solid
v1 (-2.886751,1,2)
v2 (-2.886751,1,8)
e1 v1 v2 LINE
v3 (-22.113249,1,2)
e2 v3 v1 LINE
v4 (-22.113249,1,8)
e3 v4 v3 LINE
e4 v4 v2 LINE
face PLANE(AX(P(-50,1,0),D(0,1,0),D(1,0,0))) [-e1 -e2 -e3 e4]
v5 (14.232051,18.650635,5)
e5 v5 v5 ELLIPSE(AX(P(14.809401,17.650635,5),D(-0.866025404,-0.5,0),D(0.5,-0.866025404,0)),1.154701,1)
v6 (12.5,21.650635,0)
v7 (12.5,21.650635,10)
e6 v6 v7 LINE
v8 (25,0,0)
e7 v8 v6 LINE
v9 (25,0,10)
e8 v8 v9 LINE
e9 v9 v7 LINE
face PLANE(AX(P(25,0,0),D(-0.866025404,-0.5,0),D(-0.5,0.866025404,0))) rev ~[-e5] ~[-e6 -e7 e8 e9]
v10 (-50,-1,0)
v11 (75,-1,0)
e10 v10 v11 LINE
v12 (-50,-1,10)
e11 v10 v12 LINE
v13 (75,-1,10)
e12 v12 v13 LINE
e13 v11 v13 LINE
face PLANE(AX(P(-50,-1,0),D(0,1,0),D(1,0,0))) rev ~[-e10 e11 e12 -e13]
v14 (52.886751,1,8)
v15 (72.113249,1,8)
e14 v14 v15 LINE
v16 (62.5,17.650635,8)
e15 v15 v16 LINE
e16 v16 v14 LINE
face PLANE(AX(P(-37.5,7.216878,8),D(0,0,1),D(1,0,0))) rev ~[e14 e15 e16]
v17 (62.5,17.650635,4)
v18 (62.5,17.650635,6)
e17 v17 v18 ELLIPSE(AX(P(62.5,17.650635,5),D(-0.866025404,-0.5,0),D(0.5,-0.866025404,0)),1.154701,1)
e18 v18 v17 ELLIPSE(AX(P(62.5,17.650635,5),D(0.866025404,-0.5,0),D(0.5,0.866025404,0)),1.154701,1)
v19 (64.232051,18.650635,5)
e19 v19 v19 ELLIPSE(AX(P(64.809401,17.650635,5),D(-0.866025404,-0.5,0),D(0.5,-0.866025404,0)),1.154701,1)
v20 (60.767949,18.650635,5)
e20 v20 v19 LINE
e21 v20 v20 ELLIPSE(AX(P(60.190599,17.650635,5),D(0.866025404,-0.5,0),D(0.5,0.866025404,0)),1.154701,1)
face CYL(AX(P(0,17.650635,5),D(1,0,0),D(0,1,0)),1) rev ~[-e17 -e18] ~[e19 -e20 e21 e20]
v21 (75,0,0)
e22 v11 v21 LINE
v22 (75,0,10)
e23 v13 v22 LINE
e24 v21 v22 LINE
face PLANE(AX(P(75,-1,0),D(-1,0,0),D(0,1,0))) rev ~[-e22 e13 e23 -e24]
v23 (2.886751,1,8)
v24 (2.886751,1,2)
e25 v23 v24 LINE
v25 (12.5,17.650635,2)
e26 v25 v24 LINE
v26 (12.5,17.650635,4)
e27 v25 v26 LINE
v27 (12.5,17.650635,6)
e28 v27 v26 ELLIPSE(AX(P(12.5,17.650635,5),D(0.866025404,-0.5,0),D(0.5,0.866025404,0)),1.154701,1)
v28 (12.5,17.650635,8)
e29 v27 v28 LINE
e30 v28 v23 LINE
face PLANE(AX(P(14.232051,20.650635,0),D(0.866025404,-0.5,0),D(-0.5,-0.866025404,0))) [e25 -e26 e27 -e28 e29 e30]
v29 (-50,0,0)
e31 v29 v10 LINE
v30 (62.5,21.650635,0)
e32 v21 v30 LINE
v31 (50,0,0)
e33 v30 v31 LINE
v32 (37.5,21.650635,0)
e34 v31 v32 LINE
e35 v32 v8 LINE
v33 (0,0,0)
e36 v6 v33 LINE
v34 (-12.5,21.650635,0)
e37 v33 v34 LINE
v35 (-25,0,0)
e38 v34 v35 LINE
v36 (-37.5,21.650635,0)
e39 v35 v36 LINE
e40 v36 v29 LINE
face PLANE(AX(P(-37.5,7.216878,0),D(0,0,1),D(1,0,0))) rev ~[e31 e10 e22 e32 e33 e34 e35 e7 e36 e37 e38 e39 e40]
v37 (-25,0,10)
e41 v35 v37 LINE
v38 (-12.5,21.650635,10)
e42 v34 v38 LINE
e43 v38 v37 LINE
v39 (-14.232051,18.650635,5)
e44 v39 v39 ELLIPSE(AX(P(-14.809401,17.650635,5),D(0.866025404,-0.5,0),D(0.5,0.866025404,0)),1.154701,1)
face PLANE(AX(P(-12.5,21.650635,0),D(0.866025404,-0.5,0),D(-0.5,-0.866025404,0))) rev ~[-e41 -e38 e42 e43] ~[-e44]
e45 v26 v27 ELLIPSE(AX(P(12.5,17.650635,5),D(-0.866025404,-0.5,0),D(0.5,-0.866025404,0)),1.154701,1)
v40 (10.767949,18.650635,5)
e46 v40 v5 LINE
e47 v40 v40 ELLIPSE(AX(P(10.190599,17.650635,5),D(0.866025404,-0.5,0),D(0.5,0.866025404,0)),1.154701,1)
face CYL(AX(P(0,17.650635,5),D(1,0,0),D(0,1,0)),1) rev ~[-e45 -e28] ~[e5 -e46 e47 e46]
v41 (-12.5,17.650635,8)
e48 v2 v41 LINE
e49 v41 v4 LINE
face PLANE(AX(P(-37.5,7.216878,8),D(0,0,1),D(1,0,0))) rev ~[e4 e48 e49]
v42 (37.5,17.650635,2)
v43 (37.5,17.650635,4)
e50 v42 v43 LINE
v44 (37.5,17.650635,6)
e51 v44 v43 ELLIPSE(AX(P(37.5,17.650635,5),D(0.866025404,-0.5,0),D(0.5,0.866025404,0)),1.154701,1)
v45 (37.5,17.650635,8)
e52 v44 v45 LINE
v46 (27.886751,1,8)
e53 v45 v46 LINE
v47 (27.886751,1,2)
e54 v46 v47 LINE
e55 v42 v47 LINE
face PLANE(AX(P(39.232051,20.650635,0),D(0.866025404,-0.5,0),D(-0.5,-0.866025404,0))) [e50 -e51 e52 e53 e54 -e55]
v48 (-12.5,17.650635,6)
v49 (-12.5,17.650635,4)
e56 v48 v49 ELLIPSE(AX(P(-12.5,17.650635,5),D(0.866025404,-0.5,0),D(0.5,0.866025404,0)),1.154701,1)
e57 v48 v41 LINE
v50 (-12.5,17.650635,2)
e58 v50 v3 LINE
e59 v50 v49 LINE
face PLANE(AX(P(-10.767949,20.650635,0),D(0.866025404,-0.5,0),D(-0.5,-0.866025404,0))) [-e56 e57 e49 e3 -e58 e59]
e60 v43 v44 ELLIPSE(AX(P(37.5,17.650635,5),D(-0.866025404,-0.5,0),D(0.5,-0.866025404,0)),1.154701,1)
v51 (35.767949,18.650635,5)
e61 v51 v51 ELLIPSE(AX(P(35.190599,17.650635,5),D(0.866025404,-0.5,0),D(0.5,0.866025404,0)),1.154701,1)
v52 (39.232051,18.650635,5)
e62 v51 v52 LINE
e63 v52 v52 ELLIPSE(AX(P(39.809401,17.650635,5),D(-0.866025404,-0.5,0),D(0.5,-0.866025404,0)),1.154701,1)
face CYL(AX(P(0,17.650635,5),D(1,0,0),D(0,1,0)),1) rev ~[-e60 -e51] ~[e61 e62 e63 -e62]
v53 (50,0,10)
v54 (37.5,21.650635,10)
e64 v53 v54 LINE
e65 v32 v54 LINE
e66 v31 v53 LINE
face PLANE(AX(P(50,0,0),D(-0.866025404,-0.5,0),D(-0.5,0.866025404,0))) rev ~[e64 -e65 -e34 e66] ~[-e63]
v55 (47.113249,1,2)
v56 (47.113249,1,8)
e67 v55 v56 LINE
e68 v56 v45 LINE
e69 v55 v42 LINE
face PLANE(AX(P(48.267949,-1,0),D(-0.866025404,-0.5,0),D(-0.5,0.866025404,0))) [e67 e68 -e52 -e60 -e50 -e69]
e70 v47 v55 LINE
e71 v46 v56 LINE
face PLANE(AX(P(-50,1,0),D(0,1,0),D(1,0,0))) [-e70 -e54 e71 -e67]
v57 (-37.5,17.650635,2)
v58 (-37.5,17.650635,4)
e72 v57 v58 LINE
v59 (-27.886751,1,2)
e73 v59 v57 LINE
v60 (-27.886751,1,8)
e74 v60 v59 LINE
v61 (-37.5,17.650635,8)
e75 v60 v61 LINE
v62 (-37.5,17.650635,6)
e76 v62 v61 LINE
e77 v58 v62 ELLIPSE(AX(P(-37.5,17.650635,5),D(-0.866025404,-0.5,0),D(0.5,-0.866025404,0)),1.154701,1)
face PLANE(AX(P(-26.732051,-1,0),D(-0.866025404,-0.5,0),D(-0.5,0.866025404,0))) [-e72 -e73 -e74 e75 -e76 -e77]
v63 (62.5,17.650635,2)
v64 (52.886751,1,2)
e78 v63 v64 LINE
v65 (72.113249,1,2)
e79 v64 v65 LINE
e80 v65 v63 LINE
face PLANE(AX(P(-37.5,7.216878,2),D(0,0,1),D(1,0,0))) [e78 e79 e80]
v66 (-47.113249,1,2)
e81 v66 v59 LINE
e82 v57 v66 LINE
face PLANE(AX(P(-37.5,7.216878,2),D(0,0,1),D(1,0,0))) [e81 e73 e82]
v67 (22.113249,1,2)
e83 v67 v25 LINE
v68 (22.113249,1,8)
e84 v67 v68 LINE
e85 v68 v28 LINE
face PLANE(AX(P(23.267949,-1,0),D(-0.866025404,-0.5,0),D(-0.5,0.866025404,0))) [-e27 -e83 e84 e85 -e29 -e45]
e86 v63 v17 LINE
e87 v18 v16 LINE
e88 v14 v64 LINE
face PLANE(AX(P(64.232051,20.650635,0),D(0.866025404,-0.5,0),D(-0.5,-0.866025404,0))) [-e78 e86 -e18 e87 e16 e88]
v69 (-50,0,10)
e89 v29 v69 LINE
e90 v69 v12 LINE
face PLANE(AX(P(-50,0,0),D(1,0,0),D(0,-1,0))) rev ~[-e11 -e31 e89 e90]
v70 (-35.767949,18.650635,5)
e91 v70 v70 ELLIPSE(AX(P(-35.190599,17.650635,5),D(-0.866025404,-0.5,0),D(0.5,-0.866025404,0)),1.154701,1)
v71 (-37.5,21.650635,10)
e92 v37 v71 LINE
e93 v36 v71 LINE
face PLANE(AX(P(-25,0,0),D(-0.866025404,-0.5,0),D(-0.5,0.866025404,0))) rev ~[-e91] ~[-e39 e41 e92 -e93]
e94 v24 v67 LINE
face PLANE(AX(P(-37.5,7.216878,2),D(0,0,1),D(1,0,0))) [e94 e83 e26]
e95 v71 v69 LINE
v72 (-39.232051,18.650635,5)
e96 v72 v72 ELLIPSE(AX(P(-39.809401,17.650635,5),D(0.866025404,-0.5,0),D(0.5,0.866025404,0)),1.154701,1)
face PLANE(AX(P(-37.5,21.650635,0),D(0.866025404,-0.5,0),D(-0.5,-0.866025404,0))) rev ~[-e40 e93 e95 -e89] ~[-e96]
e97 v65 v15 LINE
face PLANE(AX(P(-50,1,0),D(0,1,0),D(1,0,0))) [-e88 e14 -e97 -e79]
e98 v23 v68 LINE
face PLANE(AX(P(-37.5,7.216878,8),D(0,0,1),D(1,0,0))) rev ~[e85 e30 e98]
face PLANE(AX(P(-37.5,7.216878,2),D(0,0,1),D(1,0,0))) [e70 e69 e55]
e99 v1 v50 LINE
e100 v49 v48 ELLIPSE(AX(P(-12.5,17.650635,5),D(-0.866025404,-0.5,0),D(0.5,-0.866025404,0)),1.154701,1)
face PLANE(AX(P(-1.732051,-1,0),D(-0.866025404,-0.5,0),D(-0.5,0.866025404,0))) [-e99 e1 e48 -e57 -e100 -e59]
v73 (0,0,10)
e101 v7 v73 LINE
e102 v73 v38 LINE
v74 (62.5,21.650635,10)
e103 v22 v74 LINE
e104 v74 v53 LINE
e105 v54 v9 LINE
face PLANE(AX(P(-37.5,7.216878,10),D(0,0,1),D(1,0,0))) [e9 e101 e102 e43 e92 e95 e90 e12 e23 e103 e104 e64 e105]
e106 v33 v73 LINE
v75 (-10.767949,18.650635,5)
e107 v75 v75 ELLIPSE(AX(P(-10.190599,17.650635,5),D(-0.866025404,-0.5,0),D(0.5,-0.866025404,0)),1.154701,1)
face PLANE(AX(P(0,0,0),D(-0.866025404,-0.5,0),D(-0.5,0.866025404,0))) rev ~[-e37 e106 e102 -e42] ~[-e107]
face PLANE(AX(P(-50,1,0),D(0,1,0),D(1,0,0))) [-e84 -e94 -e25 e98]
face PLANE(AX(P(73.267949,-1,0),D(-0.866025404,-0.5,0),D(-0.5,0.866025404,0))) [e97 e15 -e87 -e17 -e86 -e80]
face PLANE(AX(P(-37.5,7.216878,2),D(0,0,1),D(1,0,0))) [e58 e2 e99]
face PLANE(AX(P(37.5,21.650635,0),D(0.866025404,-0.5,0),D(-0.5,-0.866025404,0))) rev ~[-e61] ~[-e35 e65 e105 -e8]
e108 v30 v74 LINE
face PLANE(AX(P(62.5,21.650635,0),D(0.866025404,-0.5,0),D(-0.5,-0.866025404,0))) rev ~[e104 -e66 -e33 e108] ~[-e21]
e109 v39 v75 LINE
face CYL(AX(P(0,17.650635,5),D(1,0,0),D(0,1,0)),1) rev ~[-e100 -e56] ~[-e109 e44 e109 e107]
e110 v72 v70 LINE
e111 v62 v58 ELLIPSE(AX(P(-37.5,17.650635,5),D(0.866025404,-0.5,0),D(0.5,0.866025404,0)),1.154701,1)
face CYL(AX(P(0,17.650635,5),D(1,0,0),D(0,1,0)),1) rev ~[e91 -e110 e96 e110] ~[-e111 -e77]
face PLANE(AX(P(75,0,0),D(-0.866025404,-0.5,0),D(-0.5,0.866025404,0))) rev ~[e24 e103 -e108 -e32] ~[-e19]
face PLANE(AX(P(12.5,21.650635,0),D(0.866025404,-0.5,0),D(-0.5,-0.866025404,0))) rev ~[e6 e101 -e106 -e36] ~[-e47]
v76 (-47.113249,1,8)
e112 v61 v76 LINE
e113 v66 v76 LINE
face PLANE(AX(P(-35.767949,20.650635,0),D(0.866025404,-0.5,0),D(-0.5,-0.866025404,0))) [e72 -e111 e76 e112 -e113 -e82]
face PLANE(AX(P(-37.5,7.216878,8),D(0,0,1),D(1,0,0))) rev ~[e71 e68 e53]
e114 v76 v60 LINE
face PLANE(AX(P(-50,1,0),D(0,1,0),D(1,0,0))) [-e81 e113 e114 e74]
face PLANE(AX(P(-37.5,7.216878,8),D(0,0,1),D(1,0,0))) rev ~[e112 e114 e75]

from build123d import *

# Parameters (mm, degrees)
F1_DEPTH    = 10
F2_T        = 2
F2_T3_DEPTH = 14
F3_R        = 1
F4_DEPTH    = 100


# Not quite as in the source:
# - a shell that OpenCascade refuses in one call is made with other operations: the cavity is built on its own and cut out


with BuildPart() as f1:
    # F0 (on Top) → F1 (new body)
    with BuildSketch(Plane.XY):
        Polygon((-50, 0), (-25, 0), (-37.5, 21.6506350946), align=None)
        Polygon((-12.5, 21.6506350946), (-25, 0), (0, 0), align=None)
        Polygon((12.5, 21.6506350946), (0, 0), (25, 0), align=None)
        Polygon((37.5, 21.6506350946), (25, 0), (50, 0), align=None)
        Polygon((62.5, 21.6506350946), (50, 0), (75, 0), align=None)
        Polygon((0, 0), (-25, 0), (-50, 0), (-50, -1), (75, -1), (75, 0), (50, 0), (25, 0), align=None)
    extrude(amount=F1_DEPTH)

    # F2: shell of thickness 2, made by hand


with BuildPart() as f2_core1:
    # F2_t2: copy of F1
    add(f1.part)

    # the walls: a layer under each face that stays
    f2_faces = [f2_core1.faces().sort_by_distance(p)[0] for p in [
        (-31.25, 10.8253175473, 5),
        (-43.75, 10.8253175473, 5),
        (-50, -0.5, 5),
        (12.5, -1, 5),
        (75, -0.5, 5),
        (68.75, 10.8253175473, 5),
        (56.25, 10.8253175473, 5),
        (43.75, 10.8253175473, 5),
        (31.25, 10.8253175473, 5),
        (18.75, 10.8253175473, 5),
        (6.25, 10.8253175473, 5),
        (-6.25, 10.8253175473, 5),
        (-18.75, 10.8253175473, 5),
        (12.5, 10.3253175473, 0),
        (12.5, 10.3253175473, 10),
    ]]
    thicken(f2_faces, amount=-F2_T, mode=Mode.SUBTRACT)

    # F2_s4 → F2_t3 (cut)
    with BuildSketch(Plane.XY.offset(-2)):
        Polygon((-25, 0.02), (-26.7320508076, -1), (-25, -4), (-23.2679491924, -1), align=None)
        Polygon((50, 0.02), (51.7320508076, -1), (50, -4), (48.2679491924, -1), align=None)
        Polygon((25, 0.02), (26.7320508076, -1), (25, -4), (23.2679491924, -1), align=None)
        Polygon((0, 0.02), (1.7320508076, -1), (0, -4), (-1.7320508076, -1), align=None)
    extrude(amount=F2_T3_DEPTH, mode=Mode.SUBTRACT)


with BuildPart() as f1_1:
    add(f1.part)

    # what is left inside the walls is the cavity
    f2_cavity = [f2_core1.part.solids().sort_by_distance(p)[0] for p in [
        (-37.5, 6.550212, 2.02),
        (-12.5, 6.550212, 2.02),
        (12.5, 6.550212, 2.02),
        (37.5, 6.550212, 2.02),
        (62.5, 6.550212, 2.02),
    ]]
    add(f2_cavity, mode=Mode.SUBTRACT)

    # F3 (on Right) → F4 (cut, symmetric)
    with BuildSketch(Plane.YZ):
        with Locations((17.6506350946, 5)):
            Circle(F3_R)
    extrude(amount=F4_DEPTH, both=True, mode=Mode.SUBTRACT)


solid = f1_1.part
